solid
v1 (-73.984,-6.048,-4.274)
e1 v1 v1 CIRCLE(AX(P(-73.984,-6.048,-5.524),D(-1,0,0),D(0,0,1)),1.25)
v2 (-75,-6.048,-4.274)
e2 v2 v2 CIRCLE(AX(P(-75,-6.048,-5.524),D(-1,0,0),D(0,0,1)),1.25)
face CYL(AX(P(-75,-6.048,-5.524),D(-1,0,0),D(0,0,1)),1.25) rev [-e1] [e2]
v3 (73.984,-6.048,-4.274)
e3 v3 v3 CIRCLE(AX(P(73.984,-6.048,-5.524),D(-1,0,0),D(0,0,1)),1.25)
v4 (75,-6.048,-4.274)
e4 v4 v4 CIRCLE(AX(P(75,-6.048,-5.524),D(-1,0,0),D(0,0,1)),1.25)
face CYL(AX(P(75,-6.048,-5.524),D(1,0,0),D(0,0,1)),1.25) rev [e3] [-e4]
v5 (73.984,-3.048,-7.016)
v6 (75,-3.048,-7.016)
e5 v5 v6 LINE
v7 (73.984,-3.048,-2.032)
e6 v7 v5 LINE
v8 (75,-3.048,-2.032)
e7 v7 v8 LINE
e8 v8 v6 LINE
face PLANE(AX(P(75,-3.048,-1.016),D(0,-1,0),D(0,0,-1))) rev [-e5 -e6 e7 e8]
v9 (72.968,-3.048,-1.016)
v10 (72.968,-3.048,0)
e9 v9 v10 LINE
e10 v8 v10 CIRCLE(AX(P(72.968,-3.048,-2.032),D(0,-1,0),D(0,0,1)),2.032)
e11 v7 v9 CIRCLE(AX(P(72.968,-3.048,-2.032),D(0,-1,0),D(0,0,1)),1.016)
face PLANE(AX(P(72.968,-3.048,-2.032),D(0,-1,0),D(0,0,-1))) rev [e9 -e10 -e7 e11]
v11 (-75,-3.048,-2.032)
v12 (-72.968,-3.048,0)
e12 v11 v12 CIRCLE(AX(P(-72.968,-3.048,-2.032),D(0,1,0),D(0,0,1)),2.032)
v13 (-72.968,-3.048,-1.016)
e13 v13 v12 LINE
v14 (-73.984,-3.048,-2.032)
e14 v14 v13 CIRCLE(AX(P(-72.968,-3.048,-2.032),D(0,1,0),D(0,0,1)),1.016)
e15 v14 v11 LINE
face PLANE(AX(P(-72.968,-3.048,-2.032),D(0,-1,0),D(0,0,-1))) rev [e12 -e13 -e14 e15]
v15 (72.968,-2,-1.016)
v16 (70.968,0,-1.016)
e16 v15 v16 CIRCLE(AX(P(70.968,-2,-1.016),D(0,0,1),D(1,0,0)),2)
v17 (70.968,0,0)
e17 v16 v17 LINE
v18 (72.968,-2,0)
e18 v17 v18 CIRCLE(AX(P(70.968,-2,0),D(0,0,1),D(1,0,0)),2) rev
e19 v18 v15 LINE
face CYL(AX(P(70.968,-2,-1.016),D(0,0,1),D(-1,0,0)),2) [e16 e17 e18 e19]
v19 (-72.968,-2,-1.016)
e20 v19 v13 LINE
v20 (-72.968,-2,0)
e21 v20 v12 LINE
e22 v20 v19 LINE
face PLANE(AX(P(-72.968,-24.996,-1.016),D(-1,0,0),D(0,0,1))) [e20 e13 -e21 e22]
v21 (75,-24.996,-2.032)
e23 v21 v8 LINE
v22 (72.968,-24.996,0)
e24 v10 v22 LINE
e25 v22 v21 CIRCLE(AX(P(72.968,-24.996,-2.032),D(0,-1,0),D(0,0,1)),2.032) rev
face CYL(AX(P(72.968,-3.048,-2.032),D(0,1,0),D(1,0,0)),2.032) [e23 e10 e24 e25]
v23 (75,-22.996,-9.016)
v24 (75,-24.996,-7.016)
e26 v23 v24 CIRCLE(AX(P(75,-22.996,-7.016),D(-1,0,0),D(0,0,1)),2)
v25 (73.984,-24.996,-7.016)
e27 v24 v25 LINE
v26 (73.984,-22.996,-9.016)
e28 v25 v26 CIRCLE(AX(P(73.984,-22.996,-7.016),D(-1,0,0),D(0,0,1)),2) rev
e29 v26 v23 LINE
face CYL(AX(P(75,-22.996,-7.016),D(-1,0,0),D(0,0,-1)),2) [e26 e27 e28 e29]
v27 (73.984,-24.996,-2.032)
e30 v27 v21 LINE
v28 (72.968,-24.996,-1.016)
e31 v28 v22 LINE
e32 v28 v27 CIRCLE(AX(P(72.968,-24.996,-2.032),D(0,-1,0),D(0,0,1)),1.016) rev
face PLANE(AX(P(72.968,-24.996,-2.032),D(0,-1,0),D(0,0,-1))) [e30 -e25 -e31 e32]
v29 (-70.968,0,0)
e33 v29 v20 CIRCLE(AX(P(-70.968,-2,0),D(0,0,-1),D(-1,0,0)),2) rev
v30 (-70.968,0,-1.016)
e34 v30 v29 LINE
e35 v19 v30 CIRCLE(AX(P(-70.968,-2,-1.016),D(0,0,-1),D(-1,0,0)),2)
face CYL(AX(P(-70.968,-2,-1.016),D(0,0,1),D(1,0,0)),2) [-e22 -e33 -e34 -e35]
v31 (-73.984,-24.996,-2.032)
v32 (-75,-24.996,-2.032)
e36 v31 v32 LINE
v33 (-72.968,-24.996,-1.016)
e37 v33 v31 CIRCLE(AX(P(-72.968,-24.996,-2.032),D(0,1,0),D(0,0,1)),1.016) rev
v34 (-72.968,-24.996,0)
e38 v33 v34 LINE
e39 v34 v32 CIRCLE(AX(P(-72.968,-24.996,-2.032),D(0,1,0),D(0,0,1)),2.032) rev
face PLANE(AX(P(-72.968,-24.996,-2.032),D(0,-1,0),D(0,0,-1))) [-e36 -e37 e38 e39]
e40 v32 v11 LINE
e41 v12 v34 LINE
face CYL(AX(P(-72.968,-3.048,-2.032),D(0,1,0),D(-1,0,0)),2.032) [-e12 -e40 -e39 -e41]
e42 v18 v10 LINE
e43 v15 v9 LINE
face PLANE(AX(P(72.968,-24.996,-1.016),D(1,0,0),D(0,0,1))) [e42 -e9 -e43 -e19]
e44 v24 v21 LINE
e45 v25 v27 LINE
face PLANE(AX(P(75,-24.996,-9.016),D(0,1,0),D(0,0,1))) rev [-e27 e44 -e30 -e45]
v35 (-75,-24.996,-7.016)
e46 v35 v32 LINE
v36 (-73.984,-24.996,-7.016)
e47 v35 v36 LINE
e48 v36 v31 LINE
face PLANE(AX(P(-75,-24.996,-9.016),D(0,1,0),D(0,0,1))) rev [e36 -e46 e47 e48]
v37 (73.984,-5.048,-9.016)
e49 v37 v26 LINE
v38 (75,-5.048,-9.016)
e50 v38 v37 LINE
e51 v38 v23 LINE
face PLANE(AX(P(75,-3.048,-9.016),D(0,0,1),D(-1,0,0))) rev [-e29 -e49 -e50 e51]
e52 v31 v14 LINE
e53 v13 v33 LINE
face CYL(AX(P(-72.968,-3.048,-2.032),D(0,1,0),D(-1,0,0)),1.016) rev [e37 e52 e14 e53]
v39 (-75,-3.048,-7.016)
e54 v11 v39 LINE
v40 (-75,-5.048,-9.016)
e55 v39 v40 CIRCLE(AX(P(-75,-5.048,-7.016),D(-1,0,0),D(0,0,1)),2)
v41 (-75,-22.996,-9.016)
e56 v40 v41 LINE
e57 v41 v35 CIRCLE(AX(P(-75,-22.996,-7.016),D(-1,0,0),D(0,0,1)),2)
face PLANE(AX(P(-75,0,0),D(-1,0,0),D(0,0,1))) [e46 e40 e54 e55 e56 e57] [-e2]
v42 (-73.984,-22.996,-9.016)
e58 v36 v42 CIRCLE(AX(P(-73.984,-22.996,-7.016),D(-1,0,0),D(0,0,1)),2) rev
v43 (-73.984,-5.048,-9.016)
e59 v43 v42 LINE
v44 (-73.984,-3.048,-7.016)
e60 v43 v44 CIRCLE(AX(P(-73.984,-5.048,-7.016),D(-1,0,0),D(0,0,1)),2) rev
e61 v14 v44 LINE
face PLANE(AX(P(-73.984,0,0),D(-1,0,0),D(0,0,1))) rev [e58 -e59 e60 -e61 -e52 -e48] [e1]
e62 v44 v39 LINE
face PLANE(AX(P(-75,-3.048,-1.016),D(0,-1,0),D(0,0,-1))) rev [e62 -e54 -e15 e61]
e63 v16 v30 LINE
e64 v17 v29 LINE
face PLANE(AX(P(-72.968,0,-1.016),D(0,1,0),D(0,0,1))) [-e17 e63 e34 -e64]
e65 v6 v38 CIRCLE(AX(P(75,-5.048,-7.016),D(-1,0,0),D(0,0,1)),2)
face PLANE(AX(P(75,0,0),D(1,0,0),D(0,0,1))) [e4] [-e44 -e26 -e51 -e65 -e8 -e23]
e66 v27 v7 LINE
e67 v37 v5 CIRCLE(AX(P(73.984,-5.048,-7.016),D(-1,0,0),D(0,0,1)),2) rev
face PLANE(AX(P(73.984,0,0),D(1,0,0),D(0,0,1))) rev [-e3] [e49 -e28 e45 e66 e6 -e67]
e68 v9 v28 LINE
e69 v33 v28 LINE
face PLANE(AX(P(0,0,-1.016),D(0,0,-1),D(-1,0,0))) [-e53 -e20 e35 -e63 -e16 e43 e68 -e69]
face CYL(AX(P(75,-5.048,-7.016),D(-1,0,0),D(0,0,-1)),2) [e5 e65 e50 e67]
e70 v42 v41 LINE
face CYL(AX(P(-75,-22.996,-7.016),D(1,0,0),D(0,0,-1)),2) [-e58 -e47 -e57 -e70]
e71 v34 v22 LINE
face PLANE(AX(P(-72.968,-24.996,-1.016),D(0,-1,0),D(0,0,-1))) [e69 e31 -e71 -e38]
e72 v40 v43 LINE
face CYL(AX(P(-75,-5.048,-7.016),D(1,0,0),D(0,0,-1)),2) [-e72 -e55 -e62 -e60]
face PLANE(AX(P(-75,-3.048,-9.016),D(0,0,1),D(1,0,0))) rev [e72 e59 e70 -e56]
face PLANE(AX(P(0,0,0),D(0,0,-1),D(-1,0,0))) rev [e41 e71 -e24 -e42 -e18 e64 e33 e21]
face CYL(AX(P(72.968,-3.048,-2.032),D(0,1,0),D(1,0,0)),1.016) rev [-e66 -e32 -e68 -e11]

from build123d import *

# Parameters (mm, degrees)
SKETCH2_W                   = 72.968
SKETCH2_H                   = 24.996
BASE_FLANGE1_DEPTH          = 1.016
EDGE_FLANGE1_DEPTH          = 21.948
FILLET1_R                   = 2
TAP_DRILL_FOR_M3X0_5_TAP1_D = 2.5


# Sheet-metal steps are written as plain solids
with BuildPart() as part:
    # Sketch2 → Base-Flange1 (new body)
    with BuildSketch(Plane.XY):
        with Locations((-36.484, -12.498)):
            Rectangle(SKETCH2_W, SKETCH2_H)
    extrude(amount=-BASE_FLANGE1_DEPTH)

    # Edge-Flange1 section (across the edge) → Edge-Flange1 (add)
    with BuildSketch(Plane(origin=(-73.984, -24.996, -1.016), x_dir=(1, 0, 0), z_dir=(0, 1, 0))):
        with BuildLine():
            Line((-1.016, 1.016), (-1.016, 8))
            Line((-1.016, 8), (0, 8))
            Line((0, 8), (0, 1.016))
            ThreePointArc((0, 1.016), (0.29757951, 0.29757951), (1.016, 0))
            Line((1.016, 0), (1.016, -1.016))
            ThreePointArc((1.016, -1.016), (-0.420840979, -0.420840979), (-1.016, 1.016))
        make_face()
    extrude(amount=EDGE_FLANGE1_DEPTH)

    # Fillet1
    fillet1_edges = [part.edges().sort_by_distance(p)[0] for p in [
        (-74.492, -24.996, -9.016),
        (-74.492, -3.048, -9.016),
        (-72.968, 0, -0.508),
    ]]
    fillet(fillet1_edges, radius=FILLET1_R)

    # Tap Drill for M3x0.5 Tap1 (through all)
    with Locations(Plane.ZY.offset(75)):
        with Locations((-5.524, -6.048)):
            Hole(TAP_DRILL_FOR_M3X0_5_TAP1_D / 2)

    # Mirror1: part across plane


with BuildPart() as part_1:
    add(part.part)
    add(part.part.mirror(Plane(origin=(0, -24.996, -1.016), x_dir=(0, 0, 1), z_dir=(1, 0, 0))))


solid = part_1.part
